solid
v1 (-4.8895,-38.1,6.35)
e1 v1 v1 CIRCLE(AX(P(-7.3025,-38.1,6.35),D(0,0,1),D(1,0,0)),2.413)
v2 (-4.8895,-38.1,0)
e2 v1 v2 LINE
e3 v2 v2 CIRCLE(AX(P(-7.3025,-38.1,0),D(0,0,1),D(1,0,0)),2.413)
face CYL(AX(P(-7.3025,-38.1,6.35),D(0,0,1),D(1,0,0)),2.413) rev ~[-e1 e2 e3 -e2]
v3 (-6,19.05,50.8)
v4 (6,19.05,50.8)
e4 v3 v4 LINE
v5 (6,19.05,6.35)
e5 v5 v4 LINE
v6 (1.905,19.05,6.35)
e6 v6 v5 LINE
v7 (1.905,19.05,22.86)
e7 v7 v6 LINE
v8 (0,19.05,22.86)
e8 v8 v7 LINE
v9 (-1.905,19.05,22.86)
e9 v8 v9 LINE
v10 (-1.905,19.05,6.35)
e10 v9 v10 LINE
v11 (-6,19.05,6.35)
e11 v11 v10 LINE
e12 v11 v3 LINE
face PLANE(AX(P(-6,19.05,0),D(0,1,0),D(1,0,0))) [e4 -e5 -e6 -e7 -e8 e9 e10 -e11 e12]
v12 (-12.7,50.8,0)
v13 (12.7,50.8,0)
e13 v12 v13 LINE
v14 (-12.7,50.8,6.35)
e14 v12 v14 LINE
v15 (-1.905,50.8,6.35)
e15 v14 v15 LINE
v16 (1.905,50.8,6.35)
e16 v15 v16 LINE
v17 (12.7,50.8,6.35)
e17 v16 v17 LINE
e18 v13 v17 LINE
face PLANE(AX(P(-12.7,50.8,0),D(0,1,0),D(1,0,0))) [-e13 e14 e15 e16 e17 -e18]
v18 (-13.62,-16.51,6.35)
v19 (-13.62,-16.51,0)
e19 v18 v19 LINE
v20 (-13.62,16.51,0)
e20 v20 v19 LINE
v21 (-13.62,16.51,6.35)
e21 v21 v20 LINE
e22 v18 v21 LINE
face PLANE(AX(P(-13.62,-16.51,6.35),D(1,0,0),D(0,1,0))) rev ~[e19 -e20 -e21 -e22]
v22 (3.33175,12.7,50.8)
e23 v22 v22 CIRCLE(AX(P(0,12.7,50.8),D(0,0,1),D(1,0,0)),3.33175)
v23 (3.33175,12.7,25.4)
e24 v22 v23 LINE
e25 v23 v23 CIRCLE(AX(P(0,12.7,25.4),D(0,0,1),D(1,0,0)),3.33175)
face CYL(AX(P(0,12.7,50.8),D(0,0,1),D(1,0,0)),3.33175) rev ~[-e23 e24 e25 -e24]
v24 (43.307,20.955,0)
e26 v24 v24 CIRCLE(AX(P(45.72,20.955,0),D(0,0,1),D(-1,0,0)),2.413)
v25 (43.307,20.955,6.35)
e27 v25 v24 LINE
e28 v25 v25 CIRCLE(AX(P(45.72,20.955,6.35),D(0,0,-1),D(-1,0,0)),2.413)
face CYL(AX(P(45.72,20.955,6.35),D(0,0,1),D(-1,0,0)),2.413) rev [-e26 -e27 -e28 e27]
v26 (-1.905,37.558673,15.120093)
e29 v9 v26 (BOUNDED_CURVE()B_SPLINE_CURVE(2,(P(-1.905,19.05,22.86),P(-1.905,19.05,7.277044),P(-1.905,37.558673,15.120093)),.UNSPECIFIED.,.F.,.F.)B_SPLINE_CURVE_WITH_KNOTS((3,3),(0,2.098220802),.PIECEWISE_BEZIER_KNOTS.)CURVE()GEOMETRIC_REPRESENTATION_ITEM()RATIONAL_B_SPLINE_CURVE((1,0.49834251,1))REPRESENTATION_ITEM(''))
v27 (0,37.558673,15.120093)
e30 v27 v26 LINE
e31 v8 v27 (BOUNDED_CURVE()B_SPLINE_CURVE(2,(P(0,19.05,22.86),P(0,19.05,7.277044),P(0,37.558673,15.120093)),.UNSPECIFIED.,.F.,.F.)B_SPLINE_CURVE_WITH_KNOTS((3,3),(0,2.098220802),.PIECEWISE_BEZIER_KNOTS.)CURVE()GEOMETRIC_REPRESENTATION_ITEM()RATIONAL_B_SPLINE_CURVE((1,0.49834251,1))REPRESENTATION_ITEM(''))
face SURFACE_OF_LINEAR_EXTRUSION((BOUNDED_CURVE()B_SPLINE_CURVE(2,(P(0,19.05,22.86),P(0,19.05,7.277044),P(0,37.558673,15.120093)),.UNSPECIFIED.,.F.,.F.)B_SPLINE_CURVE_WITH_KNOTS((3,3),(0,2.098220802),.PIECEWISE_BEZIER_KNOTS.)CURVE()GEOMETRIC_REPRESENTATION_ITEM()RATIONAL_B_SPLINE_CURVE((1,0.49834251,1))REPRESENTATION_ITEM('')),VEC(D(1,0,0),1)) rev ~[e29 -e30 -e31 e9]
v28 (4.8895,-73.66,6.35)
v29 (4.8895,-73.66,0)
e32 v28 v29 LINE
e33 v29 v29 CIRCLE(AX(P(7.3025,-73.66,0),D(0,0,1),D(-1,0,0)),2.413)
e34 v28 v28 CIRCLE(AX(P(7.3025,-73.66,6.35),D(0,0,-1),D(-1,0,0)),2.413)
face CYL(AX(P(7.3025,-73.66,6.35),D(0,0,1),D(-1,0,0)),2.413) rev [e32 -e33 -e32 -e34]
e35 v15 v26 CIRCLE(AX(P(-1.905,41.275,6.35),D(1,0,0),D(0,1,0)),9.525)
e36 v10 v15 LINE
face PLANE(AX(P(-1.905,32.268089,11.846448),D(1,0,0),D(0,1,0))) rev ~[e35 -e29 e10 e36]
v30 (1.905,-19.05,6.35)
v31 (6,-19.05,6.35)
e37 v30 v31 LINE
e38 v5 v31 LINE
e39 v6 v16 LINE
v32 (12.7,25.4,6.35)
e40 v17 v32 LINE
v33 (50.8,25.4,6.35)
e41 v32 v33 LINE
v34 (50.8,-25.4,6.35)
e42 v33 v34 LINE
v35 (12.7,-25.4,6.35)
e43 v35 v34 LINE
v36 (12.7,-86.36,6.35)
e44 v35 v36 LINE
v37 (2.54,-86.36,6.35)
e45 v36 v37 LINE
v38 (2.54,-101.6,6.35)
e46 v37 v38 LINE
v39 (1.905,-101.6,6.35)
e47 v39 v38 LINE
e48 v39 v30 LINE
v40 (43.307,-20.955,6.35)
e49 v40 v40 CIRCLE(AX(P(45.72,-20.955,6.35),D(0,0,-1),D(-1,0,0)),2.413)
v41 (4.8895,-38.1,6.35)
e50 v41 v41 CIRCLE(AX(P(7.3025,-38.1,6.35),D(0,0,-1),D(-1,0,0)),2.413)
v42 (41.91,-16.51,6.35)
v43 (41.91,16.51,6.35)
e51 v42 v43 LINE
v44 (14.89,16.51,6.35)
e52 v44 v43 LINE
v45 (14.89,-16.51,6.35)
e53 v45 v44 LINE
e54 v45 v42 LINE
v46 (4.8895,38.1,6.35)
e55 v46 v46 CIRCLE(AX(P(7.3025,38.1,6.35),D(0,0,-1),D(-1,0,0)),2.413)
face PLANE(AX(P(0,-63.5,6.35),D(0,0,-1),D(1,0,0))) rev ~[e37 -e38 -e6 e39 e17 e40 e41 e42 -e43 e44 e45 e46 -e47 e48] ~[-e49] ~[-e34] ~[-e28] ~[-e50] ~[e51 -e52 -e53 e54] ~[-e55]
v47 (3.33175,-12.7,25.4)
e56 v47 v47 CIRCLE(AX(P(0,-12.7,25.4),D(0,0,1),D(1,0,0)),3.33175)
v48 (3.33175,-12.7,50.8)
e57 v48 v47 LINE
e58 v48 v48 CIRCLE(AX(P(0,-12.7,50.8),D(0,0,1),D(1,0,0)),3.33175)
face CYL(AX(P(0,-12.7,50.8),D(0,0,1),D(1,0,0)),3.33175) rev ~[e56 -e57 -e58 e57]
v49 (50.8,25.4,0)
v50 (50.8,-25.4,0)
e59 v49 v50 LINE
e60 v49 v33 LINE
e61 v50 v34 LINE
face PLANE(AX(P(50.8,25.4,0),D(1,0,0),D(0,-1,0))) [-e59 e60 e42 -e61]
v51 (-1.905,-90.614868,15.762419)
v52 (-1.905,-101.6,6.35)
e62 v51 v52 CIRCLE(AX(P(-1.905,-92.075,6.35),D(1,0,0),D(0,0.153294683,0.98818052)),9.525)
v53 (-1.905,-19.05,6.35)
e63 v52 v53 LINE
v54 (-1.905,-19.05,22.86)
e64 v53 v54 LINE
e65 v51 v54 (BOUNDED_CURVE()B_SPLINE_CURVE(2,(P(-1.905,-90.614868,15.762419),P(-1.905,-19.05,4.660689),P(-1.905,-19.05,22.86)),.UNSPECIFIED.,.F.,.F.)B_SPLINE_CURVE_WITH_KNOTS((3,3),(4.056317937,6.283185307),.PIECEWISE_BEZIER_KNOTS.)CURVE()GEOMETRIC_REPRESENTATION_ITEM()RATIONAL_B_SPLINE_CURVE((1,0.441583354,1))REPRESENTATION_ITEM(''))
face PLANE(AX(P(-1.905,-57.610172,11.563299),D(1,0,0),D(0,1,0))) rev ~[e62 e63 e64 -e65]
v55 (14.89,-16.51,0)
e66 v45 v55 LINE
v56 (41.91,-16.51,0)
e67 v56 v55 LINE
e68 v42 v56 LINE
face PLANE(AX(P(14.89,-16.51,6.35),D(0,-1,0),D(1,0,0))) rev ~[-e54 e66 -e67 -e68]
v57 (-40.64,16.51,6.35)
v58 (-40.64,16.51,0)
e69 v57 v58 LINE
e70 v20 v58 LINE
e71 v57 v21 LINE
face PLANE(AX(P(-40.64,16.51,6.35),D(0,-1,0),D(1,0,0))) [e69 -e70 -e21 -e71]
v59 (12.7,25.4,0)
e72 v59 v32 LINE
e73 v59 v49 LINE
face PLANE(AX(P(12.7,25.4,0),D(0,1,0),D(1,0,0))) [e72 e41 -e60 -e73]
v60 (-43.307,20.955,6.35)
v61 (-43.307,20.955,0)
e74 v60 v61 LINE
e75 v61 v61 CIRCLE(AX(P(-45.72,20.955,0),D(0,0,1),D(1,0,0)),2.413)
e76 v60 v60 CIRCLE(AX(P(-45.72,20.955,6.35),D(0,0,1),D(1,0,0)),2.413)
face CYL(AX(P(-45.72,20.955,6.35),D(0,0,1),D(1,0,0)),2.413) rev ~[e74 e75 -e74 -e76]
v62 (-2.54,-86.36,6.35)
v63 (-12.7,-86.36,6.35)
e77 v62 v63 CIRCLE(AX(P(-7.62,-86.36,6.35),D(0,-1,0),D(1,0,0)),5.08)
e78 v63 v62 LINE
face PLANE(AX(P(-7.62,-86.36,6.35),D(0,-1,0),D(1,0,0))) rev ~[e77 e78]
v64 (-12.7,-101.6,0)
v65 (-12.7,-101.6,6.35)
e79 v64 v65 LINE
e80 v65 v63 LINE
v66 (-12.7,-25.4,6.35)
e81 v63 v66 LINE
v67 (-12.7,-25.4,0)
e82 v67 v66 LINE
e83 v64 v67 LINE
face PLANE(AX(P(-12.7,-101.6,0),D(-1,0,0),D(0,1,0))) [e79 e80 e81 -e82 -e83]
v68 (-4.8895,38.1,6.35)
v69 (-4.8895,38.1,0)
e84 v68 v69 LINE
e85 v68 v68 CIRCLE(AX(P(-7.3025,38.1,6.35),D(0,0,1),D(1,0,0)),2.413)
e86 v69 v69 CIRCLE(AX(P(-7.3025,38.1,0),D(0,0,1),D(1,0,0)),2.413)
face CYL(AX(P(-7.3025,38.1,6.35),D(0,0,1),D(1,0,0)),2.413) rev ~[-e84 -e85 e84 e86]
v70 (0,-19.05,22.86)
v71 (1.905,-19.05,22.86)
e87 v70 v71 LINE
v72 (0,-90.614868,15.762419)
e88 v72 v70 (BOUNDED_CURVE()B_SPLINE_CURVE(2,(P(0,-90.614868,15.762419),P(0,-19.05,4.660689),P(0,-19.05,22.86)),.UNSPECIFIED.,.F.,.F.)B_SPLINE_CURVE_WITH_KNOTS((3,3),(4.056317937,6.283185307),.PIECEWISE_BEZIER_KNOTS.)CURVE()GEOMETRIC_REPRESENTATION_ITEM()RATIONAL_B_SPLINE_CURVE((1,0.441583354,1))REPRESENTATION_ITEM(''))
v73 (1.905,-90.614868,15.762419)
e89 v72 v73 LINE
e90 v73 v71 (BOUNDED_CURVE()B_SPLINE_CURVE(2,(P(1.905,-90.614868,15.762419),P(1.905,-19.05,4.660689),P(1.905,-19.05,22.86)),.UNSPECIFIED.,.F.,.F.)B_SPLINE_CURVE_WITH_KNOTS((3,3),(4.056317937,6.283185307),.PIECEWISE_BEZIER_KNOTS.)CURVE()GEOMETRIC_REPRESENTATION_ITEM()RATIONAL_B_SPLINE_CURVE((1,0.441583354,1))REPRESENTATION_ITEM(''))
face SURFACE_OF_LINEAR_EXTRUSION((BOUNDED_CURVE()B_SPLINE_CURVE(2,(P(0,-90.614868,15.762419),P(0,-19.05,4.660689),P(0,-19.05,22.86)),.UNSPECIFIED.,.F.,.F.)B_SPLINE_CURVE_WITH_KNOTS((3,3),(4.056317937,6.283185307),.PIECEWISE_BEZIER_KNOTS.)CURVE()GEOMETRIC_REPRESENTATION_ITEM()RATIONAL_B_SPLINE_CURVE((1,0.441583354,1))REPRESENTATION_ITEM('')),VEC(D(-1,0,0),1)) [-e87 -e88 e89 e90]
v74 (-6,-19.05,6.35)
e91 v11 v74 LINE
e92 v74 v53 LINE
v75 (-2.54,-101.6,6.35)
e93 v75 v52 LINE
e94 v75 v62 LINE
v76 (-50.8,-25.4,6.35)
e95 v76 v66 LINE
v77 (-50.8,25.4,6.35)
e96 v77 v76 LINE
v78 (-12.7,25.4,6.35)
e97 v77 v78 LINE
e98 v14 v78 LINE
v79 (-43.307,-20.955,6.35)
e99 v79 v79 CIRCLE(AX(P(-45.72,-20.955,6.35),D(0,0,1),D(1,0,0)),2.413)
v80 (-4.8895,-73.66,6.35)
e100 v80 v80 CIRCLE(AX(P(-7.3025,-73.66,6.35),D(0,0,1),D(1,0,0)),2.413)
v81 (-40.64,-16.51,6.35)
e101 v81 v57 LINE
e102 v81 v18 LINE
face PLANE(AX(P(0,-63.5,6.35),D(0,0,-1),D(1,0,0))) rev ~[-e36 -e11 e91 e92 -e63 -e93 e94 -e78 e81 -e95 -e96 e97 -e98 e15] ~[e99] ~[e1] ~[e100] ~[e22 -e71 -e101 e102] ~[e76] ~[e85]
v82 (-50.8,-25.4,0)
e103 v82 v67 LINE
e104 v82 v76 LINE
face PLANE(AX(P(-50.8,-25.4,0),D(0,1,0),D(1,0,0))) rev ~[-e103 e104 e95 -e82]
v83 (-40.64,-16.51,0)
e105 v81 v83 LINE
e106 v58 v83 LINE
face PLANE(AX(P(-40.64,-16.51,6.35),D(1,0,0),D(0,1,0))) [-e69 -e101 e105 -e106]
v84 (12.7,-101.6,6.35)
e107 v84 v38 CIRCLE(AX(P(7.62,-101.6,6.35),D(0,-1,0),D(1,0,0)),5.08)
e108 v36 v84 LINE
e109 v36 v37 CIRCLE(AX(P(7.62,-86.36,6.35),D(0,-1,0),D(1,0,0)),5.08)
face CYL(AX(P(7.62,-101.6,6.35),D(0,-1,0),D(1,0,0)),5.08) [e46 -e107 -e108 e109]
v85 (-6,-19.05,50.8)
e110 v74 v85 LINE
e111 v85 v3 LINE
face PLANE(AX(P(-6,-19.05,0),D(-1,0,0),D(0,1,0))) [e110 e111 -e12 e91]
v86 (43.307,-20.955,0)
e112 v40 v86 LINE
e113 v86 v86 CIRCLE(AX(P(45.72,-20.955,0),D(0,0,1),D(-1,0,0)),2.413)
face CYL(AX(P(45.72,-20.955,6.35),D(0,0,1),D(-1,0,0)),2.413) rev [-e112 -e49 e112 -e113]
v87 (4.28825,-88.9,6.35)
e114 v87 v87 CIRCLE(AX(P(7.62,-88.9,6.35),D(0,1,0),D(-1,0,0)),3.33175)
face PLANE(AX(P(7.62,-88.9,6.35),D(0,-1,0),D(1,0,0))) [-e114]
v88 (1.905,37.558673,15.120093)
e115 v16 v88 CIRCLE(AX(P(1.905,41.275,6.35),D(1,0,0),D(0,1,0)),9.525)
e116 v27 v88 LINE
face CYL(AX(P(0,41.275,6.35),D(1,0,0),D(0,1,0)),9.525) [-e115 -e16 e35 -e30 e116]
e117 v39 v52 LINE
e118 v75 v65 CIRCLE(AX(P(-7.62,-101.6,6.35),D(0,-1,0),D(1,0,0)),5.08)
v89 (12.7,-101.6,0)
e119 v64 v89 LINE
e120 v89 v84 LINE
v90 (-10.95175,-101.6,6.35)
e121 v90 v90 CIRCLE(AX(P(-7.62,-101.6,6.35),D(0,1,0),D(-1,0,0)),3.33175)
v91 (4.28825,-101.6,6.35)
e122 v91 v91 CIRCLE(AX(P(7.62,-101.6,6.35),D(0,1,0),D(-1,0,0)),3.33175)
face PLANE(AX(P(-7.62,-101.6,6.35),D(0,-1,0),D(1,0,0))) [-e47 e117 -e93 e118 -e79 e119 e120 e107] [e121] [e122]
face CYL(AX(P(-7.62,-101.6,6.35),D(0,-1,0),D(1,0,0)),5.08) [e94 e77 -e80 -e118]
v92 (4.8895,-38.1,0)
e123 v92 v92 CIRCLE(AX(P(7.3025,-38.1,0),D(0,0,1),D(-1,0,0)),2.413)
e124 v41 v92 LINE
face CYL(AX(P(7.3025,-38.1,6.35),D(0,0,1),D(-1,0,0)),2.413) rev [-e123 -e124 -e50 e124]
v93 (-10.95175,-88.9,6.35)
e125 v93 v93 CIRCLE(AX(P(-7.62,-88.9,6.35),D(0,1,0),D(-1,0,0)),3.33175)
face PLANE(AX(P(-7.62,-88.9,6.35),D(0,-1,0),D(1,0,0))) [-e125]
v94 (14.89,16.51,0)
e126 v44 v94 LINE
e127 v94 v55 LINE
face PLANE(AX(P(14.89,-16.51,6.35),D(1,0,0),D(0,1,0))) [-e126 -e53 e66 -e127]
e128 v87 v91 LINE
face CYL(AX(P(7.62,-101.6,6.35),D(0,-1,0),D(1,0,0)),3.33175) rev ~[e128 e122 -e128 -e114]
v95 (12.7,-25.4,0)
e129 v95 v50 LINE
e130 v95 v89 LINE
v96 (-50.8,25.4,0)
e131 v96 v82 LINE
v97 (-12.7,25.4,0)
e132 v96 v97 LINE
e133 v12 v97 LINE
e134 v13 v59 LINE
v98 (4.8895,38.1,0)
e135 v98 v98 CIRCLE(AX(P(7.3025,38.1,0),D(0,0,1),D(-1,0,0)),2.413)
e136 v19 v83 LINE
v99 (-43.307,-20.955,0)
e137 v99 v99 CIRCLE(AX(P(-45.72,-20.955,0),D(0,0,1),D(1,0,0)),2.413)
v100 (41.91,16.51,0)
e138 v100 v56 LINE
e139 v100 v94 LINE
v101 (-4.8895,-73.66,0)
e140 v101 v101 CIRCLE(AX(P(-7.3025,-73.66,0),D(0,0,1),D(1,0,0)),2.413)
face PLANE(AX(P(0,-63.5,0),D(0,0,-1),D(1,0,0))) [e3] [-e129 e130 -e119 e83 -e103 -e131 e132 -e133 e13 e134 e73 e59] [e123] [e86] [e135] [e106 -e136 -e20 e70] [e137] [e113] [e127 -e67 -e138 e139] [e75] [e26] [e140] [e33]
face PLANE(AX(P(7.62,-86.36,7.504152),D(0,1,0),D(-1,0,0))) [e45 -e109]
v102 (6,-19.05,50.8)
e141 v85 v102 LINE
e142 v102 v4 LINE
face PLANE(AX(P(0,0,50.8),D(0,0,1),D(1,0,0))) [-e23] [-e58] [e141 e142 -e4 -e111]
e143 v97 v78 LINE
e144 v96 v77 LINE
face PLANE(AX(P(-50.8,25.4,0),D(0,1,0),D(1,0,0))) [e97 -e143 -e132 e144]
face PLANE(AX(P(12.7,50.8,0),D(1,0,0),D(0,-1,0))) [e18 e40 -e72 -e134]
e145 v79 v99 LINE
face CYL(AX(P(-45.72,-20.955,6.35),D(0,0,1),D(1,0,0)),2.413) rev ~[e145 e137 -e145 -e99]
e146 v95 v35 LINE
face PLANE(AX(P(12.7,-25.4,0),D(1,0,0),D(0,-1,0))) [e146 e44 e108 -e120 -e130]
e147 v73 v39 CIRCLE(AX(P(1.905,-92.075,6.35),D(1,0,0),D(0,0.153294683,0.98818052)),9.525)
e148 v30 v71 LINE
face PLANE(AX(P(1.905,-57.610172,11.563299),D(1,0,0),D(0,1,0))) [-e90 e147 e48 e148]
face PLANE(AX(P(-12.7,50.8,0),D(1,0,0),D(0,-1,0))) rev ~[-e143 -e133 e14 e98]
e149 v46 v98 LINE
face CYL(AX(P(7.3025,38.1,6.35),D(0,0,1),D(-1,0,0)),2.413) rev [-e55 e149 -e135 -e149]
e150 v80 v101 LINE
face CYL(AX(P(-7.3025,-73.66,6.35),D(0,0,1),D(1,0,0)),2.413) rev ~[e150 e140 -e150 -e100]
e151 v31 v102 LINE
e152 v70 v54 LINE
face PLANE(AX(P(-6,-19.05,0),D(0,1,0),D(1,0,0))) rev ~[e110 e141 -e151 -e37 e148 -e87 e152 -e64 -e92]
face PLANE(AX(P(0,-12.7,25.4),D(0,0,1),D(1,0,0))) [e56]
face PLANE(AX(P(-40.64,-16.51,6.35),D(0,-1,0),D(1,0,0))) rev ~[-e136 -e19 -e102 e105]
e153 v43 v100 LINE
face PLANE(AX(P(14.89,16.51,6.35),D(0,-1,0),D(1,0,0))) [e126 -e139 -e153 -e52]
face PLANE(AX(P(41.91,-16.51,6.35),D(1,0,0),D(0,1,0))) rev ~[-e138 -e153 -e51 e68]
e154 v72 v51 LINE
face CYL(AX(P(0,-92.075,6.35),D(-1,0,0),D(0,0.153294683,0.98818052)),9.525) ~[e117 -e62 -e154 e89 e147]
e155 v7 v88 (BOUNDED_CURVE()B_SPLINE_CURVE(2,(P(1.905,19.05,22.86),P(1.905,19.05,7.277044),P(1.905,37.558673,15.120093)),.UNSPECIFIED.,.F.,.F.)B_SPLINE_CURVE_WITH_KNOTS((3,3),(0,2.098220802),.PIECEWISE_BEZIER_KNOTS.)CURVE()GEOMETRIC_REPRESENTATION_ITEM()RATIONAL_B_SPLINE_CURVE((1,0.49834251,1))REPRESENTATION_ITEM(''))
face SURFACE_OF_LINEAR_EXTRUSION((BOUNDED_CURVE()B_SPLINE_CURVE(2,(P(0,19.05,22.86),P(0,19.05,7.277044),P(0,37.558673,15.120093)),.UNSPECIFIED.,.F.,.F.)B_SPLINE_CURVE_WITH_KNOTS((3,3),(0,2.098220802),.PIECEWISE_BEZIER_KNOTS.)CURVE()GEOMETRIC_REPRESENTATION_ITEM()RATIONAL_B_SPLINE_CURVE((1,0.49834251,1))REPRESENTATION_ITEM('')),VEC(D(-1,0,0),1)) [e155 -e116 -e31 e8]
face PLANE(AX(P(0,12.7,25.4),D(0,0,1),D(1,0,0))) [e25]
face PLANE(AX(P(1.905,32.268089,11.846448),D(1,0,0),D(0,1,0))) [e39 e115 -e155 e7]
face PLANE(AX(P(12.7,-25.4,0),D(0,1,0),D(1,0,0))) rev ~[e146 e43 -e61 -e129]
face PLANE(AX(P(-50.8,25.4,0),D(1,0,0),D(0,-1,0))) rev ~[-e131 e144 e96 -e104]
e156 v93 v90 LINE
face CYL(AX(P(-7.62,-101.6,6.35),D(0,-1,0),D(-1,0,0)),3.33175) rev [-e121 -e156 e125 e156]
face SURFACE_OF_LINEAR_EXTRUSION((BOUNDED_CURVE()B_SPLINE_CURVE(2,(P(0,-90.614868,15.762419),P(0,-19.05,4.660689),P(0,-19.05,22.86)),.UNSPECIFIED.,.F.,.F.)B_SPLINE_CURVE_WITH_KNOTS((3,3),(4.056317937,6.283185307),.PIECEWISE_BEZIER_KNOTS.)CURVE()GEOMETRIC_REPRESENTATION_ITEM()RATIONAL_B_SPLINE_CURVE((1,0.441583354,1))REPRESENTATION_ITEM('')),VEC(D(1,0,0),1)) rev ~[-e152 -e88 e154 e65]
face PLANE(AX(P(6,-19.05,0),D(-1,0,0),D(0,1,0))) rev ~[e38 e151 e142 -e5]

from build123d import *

# Parameters (mm, degrees)
F0_W      = 12
F0_H      = 38.1
F1_DEPTH  = 50.8
F2_R      = 3.33175
F3_DEPTH  = 25.4
F4_W      = 25.4
F4_H      = 76.2
F4_W_2    = 38.1
F4_H_2    = 50.8
F4_W_3    = 12
F4_H_3    = 38.1
F4_H_4    = 25.4
F5_DEPTH  = 6.35
F7_DEPTH  = 1.905
F8_R      = 3.33175
F9_DEPTH  = 12.7
F10_R     = 5.08
F11_DEPTH = 15.24
F13_DEPTH = 2.54
F14_W     = 27.02
F14_H     = 33.02
F15_DEPTH = 6.351
F16_R     = 2.413
F17_DEPTH = 6.351


# Not quite as in the source:
# - a pattern or mirror of a feature is missing from the dataset's text; its kind, count and spacing are read off the source's solid


with BuildPart() as f1:
    # F0 (on Top) → F1 (new body)
    with BuildSketch(Plane.XY):
        Rectangle(F0_W, F0_H)
    extrude(amount=F1_DEPTH)

    # F2 (on face) → F3 (cut)
    with BuildSketch(Plane.XY.offset(50.8)):
        with Locations((0, 12.7)):
            Circle(F2_R)
        with Locations((0, -12.7)):
            Circle(F2_R)
    extrude(amount=-F3_DEPTH, mode=Mode.SUBTRACT)

    # F4 (on face) → F5 (join)
    with BuildSketch(Plane(origin=(0, 0, 0), x_dir=(1, 0, 0), z_dir=(0, 0, -1))):
        with Locations((0, 63.5)):
            Rectangle(F4_W, F4_H)
        with Locations((31.75, 0)):
            Rectangle(F4_W_2, F4_H_2)
        Rectangle(F4_W, F4_H_2)
        Rectangle(F4_W_3, F4_H_3, mode=Mode.SUBTRACT)
        with Locations((-31.75, 0)):
            Rectangle(F4_W_2, F4_H_2)
        with Locations((0, -38.1)):
            Rectangle(F4_W, F4_H_4)
    extrude(amount=-F5_DEPTH)

    # F6 (on Right) → F7 (join, symmetric)
    with BuildSketch(Plane.YZ):
        with BuildLine():
            Line((-19.05, 6.35), (-19.05, 22.86))
            add(Edge.make_bspline(
                [(-90.6148681487, 15.7624194539), (-19.05, 4.6606890297), (-19.05, 22.86)],
                knots=[4.0563179373, 4.0563179373, 4.0563179373, 6.2831853072, 6.2831853072, 6.2831853072], degree=2, weights=[1, 0.4415833544, 1]))
            ThreePointArc((-90.6148681487, 15.7624194539), (-98.2724942161, 13.5830277507), (-101.6, 6.35))
            Line((-101.6, 6.35), (-25.4, 6.35))
            Line((-25.4, 6.35), (-19.05, 6.35))
        make_face()
        with BuildLine():
            Line((19.05, 22.86), (19.05, 6.35))
            Line((19.05, 6.35), (25.4, 6.35))
            Line((25.4, 6.35), (50.8, 6.35))
            ThreePointArc((50.8, 6.35), (46.5346393393, 14.2911472106), (37.5586731715, 15.1200934946))
            add(Edge.make_bspline(
                [(19.05, 22.86), (19.05, 7.2770438497), (37.5586731715, 15.1200934946)],
                knots=[0, 0, 0, 2.0982208016, 2.0982208016, 2.0982208016], degree=2, weights=[1, 0.4983425099, 1]))
        make_face()
    extrude(amount=F7_DEPTH, both=True)

    # F8 (on face) → F9 (cut)
    with BuildSketch(Plane.XZ.offset(101.6)):
        with Locations((-7.62, 6.35)):
            Circle(F8_R)
        with Locations((7.62, 6.35)):
            Circle(F8_R)
    extrude(amount=-F9_DEPTH, mode=Mode.SUBTRACT)

    # F10 (on face) → F11 (join)
    with BuildSketch(Plane.XZ.offset(101.6)):
        with Locations((-7.62, 6.35)):
            Circle(F10_R)
        with BuildLine():
            ThreePointArc((-4.28825, 6.35), (-7.62, 3.01825), (-10.95175, 6.35))
            ThreePointArc((-10.95175, 6.35), (-7.62, 9.68175), (-4.28825, 6.35))
        make_face(mode=Mode.SUBTRACT)
        with Locations((7.62, 6.35)):
            Circle(F10_R)
        with BuildLine():
            ThreePointArc((10.95175, 6.35), (7.62, 3.01825), (4.28825, 6.35))
            ThreePointArc((4.28825, 6.35), (7.62, 9.68175), (10.95175, 6.35))
        make_face(mode=Mode.SUBTRACT)
    extrude(amount=-F11_DEPTH)

    # F12 (on face) → F13 (join)
    with BuildSketch(Plane(origin=(0, -86.36, 0), x_dir=(-1, 0, 0), z_dir=(0, 1, 0))):
        with BuildLine():
            ThreePointArc((-4.28825, 6.35), (-7.62, 9.68175), (-10.95175, 6.35))
            Line((-10.95175, 6.35), (-4.28825, 6.35))
        make_face()
        with BuildLine():
            ThreePointArc((10.95175, 6.35), (7.62, 9.68175), (4.28825, 6.35))
            Line((4.28825, 6.35), (10.95175, 6.35))
        make_face()
    extrude(amount=-F13_DEPTH)

    # F14 (on face) → F15 (cut, through all)
    with BuildSketch(Plane.XY.offset(6.35)):
        with Locations((-27.13, 0)):
            Rectangle(F14_W, F14_H)
        with Locations((28.4, 0)):
            Rectangle(F14_W, F14_H)
    extrude(amount=-F15_DEPTH, mode=Mode.SUBTRACT)

    # F16 (on face) → F17 (cut, through all)
    with BuildSketch(Plane.XY.offset(6.35)):
        with Locations((-7.3025, -73.66)):
            Circle(F16_R)
        with Locations((-7.3025, -38.1)):
            Circle(F16_R)
        with Locations((-45.72, -20.955)):
            Circle(F16_R)
        with Locations((-45.72, 20.955)):
            Circle(F16_R)
        with Locations((-7.3025, 38.1)):
            Circle(F16_R)
    f17 = extrude(amount=-F17_DEPTH, mode=Mode.SUBTRACT)

    # F17_copies: F17 across plane
    add(f17.mirror(Plane(origin=(0, 0, 0), x_dir=(0, 0, 1), z_dir=(1, 0, 0))), mode=Mode.SUBTRACT)


solid = f1.part
